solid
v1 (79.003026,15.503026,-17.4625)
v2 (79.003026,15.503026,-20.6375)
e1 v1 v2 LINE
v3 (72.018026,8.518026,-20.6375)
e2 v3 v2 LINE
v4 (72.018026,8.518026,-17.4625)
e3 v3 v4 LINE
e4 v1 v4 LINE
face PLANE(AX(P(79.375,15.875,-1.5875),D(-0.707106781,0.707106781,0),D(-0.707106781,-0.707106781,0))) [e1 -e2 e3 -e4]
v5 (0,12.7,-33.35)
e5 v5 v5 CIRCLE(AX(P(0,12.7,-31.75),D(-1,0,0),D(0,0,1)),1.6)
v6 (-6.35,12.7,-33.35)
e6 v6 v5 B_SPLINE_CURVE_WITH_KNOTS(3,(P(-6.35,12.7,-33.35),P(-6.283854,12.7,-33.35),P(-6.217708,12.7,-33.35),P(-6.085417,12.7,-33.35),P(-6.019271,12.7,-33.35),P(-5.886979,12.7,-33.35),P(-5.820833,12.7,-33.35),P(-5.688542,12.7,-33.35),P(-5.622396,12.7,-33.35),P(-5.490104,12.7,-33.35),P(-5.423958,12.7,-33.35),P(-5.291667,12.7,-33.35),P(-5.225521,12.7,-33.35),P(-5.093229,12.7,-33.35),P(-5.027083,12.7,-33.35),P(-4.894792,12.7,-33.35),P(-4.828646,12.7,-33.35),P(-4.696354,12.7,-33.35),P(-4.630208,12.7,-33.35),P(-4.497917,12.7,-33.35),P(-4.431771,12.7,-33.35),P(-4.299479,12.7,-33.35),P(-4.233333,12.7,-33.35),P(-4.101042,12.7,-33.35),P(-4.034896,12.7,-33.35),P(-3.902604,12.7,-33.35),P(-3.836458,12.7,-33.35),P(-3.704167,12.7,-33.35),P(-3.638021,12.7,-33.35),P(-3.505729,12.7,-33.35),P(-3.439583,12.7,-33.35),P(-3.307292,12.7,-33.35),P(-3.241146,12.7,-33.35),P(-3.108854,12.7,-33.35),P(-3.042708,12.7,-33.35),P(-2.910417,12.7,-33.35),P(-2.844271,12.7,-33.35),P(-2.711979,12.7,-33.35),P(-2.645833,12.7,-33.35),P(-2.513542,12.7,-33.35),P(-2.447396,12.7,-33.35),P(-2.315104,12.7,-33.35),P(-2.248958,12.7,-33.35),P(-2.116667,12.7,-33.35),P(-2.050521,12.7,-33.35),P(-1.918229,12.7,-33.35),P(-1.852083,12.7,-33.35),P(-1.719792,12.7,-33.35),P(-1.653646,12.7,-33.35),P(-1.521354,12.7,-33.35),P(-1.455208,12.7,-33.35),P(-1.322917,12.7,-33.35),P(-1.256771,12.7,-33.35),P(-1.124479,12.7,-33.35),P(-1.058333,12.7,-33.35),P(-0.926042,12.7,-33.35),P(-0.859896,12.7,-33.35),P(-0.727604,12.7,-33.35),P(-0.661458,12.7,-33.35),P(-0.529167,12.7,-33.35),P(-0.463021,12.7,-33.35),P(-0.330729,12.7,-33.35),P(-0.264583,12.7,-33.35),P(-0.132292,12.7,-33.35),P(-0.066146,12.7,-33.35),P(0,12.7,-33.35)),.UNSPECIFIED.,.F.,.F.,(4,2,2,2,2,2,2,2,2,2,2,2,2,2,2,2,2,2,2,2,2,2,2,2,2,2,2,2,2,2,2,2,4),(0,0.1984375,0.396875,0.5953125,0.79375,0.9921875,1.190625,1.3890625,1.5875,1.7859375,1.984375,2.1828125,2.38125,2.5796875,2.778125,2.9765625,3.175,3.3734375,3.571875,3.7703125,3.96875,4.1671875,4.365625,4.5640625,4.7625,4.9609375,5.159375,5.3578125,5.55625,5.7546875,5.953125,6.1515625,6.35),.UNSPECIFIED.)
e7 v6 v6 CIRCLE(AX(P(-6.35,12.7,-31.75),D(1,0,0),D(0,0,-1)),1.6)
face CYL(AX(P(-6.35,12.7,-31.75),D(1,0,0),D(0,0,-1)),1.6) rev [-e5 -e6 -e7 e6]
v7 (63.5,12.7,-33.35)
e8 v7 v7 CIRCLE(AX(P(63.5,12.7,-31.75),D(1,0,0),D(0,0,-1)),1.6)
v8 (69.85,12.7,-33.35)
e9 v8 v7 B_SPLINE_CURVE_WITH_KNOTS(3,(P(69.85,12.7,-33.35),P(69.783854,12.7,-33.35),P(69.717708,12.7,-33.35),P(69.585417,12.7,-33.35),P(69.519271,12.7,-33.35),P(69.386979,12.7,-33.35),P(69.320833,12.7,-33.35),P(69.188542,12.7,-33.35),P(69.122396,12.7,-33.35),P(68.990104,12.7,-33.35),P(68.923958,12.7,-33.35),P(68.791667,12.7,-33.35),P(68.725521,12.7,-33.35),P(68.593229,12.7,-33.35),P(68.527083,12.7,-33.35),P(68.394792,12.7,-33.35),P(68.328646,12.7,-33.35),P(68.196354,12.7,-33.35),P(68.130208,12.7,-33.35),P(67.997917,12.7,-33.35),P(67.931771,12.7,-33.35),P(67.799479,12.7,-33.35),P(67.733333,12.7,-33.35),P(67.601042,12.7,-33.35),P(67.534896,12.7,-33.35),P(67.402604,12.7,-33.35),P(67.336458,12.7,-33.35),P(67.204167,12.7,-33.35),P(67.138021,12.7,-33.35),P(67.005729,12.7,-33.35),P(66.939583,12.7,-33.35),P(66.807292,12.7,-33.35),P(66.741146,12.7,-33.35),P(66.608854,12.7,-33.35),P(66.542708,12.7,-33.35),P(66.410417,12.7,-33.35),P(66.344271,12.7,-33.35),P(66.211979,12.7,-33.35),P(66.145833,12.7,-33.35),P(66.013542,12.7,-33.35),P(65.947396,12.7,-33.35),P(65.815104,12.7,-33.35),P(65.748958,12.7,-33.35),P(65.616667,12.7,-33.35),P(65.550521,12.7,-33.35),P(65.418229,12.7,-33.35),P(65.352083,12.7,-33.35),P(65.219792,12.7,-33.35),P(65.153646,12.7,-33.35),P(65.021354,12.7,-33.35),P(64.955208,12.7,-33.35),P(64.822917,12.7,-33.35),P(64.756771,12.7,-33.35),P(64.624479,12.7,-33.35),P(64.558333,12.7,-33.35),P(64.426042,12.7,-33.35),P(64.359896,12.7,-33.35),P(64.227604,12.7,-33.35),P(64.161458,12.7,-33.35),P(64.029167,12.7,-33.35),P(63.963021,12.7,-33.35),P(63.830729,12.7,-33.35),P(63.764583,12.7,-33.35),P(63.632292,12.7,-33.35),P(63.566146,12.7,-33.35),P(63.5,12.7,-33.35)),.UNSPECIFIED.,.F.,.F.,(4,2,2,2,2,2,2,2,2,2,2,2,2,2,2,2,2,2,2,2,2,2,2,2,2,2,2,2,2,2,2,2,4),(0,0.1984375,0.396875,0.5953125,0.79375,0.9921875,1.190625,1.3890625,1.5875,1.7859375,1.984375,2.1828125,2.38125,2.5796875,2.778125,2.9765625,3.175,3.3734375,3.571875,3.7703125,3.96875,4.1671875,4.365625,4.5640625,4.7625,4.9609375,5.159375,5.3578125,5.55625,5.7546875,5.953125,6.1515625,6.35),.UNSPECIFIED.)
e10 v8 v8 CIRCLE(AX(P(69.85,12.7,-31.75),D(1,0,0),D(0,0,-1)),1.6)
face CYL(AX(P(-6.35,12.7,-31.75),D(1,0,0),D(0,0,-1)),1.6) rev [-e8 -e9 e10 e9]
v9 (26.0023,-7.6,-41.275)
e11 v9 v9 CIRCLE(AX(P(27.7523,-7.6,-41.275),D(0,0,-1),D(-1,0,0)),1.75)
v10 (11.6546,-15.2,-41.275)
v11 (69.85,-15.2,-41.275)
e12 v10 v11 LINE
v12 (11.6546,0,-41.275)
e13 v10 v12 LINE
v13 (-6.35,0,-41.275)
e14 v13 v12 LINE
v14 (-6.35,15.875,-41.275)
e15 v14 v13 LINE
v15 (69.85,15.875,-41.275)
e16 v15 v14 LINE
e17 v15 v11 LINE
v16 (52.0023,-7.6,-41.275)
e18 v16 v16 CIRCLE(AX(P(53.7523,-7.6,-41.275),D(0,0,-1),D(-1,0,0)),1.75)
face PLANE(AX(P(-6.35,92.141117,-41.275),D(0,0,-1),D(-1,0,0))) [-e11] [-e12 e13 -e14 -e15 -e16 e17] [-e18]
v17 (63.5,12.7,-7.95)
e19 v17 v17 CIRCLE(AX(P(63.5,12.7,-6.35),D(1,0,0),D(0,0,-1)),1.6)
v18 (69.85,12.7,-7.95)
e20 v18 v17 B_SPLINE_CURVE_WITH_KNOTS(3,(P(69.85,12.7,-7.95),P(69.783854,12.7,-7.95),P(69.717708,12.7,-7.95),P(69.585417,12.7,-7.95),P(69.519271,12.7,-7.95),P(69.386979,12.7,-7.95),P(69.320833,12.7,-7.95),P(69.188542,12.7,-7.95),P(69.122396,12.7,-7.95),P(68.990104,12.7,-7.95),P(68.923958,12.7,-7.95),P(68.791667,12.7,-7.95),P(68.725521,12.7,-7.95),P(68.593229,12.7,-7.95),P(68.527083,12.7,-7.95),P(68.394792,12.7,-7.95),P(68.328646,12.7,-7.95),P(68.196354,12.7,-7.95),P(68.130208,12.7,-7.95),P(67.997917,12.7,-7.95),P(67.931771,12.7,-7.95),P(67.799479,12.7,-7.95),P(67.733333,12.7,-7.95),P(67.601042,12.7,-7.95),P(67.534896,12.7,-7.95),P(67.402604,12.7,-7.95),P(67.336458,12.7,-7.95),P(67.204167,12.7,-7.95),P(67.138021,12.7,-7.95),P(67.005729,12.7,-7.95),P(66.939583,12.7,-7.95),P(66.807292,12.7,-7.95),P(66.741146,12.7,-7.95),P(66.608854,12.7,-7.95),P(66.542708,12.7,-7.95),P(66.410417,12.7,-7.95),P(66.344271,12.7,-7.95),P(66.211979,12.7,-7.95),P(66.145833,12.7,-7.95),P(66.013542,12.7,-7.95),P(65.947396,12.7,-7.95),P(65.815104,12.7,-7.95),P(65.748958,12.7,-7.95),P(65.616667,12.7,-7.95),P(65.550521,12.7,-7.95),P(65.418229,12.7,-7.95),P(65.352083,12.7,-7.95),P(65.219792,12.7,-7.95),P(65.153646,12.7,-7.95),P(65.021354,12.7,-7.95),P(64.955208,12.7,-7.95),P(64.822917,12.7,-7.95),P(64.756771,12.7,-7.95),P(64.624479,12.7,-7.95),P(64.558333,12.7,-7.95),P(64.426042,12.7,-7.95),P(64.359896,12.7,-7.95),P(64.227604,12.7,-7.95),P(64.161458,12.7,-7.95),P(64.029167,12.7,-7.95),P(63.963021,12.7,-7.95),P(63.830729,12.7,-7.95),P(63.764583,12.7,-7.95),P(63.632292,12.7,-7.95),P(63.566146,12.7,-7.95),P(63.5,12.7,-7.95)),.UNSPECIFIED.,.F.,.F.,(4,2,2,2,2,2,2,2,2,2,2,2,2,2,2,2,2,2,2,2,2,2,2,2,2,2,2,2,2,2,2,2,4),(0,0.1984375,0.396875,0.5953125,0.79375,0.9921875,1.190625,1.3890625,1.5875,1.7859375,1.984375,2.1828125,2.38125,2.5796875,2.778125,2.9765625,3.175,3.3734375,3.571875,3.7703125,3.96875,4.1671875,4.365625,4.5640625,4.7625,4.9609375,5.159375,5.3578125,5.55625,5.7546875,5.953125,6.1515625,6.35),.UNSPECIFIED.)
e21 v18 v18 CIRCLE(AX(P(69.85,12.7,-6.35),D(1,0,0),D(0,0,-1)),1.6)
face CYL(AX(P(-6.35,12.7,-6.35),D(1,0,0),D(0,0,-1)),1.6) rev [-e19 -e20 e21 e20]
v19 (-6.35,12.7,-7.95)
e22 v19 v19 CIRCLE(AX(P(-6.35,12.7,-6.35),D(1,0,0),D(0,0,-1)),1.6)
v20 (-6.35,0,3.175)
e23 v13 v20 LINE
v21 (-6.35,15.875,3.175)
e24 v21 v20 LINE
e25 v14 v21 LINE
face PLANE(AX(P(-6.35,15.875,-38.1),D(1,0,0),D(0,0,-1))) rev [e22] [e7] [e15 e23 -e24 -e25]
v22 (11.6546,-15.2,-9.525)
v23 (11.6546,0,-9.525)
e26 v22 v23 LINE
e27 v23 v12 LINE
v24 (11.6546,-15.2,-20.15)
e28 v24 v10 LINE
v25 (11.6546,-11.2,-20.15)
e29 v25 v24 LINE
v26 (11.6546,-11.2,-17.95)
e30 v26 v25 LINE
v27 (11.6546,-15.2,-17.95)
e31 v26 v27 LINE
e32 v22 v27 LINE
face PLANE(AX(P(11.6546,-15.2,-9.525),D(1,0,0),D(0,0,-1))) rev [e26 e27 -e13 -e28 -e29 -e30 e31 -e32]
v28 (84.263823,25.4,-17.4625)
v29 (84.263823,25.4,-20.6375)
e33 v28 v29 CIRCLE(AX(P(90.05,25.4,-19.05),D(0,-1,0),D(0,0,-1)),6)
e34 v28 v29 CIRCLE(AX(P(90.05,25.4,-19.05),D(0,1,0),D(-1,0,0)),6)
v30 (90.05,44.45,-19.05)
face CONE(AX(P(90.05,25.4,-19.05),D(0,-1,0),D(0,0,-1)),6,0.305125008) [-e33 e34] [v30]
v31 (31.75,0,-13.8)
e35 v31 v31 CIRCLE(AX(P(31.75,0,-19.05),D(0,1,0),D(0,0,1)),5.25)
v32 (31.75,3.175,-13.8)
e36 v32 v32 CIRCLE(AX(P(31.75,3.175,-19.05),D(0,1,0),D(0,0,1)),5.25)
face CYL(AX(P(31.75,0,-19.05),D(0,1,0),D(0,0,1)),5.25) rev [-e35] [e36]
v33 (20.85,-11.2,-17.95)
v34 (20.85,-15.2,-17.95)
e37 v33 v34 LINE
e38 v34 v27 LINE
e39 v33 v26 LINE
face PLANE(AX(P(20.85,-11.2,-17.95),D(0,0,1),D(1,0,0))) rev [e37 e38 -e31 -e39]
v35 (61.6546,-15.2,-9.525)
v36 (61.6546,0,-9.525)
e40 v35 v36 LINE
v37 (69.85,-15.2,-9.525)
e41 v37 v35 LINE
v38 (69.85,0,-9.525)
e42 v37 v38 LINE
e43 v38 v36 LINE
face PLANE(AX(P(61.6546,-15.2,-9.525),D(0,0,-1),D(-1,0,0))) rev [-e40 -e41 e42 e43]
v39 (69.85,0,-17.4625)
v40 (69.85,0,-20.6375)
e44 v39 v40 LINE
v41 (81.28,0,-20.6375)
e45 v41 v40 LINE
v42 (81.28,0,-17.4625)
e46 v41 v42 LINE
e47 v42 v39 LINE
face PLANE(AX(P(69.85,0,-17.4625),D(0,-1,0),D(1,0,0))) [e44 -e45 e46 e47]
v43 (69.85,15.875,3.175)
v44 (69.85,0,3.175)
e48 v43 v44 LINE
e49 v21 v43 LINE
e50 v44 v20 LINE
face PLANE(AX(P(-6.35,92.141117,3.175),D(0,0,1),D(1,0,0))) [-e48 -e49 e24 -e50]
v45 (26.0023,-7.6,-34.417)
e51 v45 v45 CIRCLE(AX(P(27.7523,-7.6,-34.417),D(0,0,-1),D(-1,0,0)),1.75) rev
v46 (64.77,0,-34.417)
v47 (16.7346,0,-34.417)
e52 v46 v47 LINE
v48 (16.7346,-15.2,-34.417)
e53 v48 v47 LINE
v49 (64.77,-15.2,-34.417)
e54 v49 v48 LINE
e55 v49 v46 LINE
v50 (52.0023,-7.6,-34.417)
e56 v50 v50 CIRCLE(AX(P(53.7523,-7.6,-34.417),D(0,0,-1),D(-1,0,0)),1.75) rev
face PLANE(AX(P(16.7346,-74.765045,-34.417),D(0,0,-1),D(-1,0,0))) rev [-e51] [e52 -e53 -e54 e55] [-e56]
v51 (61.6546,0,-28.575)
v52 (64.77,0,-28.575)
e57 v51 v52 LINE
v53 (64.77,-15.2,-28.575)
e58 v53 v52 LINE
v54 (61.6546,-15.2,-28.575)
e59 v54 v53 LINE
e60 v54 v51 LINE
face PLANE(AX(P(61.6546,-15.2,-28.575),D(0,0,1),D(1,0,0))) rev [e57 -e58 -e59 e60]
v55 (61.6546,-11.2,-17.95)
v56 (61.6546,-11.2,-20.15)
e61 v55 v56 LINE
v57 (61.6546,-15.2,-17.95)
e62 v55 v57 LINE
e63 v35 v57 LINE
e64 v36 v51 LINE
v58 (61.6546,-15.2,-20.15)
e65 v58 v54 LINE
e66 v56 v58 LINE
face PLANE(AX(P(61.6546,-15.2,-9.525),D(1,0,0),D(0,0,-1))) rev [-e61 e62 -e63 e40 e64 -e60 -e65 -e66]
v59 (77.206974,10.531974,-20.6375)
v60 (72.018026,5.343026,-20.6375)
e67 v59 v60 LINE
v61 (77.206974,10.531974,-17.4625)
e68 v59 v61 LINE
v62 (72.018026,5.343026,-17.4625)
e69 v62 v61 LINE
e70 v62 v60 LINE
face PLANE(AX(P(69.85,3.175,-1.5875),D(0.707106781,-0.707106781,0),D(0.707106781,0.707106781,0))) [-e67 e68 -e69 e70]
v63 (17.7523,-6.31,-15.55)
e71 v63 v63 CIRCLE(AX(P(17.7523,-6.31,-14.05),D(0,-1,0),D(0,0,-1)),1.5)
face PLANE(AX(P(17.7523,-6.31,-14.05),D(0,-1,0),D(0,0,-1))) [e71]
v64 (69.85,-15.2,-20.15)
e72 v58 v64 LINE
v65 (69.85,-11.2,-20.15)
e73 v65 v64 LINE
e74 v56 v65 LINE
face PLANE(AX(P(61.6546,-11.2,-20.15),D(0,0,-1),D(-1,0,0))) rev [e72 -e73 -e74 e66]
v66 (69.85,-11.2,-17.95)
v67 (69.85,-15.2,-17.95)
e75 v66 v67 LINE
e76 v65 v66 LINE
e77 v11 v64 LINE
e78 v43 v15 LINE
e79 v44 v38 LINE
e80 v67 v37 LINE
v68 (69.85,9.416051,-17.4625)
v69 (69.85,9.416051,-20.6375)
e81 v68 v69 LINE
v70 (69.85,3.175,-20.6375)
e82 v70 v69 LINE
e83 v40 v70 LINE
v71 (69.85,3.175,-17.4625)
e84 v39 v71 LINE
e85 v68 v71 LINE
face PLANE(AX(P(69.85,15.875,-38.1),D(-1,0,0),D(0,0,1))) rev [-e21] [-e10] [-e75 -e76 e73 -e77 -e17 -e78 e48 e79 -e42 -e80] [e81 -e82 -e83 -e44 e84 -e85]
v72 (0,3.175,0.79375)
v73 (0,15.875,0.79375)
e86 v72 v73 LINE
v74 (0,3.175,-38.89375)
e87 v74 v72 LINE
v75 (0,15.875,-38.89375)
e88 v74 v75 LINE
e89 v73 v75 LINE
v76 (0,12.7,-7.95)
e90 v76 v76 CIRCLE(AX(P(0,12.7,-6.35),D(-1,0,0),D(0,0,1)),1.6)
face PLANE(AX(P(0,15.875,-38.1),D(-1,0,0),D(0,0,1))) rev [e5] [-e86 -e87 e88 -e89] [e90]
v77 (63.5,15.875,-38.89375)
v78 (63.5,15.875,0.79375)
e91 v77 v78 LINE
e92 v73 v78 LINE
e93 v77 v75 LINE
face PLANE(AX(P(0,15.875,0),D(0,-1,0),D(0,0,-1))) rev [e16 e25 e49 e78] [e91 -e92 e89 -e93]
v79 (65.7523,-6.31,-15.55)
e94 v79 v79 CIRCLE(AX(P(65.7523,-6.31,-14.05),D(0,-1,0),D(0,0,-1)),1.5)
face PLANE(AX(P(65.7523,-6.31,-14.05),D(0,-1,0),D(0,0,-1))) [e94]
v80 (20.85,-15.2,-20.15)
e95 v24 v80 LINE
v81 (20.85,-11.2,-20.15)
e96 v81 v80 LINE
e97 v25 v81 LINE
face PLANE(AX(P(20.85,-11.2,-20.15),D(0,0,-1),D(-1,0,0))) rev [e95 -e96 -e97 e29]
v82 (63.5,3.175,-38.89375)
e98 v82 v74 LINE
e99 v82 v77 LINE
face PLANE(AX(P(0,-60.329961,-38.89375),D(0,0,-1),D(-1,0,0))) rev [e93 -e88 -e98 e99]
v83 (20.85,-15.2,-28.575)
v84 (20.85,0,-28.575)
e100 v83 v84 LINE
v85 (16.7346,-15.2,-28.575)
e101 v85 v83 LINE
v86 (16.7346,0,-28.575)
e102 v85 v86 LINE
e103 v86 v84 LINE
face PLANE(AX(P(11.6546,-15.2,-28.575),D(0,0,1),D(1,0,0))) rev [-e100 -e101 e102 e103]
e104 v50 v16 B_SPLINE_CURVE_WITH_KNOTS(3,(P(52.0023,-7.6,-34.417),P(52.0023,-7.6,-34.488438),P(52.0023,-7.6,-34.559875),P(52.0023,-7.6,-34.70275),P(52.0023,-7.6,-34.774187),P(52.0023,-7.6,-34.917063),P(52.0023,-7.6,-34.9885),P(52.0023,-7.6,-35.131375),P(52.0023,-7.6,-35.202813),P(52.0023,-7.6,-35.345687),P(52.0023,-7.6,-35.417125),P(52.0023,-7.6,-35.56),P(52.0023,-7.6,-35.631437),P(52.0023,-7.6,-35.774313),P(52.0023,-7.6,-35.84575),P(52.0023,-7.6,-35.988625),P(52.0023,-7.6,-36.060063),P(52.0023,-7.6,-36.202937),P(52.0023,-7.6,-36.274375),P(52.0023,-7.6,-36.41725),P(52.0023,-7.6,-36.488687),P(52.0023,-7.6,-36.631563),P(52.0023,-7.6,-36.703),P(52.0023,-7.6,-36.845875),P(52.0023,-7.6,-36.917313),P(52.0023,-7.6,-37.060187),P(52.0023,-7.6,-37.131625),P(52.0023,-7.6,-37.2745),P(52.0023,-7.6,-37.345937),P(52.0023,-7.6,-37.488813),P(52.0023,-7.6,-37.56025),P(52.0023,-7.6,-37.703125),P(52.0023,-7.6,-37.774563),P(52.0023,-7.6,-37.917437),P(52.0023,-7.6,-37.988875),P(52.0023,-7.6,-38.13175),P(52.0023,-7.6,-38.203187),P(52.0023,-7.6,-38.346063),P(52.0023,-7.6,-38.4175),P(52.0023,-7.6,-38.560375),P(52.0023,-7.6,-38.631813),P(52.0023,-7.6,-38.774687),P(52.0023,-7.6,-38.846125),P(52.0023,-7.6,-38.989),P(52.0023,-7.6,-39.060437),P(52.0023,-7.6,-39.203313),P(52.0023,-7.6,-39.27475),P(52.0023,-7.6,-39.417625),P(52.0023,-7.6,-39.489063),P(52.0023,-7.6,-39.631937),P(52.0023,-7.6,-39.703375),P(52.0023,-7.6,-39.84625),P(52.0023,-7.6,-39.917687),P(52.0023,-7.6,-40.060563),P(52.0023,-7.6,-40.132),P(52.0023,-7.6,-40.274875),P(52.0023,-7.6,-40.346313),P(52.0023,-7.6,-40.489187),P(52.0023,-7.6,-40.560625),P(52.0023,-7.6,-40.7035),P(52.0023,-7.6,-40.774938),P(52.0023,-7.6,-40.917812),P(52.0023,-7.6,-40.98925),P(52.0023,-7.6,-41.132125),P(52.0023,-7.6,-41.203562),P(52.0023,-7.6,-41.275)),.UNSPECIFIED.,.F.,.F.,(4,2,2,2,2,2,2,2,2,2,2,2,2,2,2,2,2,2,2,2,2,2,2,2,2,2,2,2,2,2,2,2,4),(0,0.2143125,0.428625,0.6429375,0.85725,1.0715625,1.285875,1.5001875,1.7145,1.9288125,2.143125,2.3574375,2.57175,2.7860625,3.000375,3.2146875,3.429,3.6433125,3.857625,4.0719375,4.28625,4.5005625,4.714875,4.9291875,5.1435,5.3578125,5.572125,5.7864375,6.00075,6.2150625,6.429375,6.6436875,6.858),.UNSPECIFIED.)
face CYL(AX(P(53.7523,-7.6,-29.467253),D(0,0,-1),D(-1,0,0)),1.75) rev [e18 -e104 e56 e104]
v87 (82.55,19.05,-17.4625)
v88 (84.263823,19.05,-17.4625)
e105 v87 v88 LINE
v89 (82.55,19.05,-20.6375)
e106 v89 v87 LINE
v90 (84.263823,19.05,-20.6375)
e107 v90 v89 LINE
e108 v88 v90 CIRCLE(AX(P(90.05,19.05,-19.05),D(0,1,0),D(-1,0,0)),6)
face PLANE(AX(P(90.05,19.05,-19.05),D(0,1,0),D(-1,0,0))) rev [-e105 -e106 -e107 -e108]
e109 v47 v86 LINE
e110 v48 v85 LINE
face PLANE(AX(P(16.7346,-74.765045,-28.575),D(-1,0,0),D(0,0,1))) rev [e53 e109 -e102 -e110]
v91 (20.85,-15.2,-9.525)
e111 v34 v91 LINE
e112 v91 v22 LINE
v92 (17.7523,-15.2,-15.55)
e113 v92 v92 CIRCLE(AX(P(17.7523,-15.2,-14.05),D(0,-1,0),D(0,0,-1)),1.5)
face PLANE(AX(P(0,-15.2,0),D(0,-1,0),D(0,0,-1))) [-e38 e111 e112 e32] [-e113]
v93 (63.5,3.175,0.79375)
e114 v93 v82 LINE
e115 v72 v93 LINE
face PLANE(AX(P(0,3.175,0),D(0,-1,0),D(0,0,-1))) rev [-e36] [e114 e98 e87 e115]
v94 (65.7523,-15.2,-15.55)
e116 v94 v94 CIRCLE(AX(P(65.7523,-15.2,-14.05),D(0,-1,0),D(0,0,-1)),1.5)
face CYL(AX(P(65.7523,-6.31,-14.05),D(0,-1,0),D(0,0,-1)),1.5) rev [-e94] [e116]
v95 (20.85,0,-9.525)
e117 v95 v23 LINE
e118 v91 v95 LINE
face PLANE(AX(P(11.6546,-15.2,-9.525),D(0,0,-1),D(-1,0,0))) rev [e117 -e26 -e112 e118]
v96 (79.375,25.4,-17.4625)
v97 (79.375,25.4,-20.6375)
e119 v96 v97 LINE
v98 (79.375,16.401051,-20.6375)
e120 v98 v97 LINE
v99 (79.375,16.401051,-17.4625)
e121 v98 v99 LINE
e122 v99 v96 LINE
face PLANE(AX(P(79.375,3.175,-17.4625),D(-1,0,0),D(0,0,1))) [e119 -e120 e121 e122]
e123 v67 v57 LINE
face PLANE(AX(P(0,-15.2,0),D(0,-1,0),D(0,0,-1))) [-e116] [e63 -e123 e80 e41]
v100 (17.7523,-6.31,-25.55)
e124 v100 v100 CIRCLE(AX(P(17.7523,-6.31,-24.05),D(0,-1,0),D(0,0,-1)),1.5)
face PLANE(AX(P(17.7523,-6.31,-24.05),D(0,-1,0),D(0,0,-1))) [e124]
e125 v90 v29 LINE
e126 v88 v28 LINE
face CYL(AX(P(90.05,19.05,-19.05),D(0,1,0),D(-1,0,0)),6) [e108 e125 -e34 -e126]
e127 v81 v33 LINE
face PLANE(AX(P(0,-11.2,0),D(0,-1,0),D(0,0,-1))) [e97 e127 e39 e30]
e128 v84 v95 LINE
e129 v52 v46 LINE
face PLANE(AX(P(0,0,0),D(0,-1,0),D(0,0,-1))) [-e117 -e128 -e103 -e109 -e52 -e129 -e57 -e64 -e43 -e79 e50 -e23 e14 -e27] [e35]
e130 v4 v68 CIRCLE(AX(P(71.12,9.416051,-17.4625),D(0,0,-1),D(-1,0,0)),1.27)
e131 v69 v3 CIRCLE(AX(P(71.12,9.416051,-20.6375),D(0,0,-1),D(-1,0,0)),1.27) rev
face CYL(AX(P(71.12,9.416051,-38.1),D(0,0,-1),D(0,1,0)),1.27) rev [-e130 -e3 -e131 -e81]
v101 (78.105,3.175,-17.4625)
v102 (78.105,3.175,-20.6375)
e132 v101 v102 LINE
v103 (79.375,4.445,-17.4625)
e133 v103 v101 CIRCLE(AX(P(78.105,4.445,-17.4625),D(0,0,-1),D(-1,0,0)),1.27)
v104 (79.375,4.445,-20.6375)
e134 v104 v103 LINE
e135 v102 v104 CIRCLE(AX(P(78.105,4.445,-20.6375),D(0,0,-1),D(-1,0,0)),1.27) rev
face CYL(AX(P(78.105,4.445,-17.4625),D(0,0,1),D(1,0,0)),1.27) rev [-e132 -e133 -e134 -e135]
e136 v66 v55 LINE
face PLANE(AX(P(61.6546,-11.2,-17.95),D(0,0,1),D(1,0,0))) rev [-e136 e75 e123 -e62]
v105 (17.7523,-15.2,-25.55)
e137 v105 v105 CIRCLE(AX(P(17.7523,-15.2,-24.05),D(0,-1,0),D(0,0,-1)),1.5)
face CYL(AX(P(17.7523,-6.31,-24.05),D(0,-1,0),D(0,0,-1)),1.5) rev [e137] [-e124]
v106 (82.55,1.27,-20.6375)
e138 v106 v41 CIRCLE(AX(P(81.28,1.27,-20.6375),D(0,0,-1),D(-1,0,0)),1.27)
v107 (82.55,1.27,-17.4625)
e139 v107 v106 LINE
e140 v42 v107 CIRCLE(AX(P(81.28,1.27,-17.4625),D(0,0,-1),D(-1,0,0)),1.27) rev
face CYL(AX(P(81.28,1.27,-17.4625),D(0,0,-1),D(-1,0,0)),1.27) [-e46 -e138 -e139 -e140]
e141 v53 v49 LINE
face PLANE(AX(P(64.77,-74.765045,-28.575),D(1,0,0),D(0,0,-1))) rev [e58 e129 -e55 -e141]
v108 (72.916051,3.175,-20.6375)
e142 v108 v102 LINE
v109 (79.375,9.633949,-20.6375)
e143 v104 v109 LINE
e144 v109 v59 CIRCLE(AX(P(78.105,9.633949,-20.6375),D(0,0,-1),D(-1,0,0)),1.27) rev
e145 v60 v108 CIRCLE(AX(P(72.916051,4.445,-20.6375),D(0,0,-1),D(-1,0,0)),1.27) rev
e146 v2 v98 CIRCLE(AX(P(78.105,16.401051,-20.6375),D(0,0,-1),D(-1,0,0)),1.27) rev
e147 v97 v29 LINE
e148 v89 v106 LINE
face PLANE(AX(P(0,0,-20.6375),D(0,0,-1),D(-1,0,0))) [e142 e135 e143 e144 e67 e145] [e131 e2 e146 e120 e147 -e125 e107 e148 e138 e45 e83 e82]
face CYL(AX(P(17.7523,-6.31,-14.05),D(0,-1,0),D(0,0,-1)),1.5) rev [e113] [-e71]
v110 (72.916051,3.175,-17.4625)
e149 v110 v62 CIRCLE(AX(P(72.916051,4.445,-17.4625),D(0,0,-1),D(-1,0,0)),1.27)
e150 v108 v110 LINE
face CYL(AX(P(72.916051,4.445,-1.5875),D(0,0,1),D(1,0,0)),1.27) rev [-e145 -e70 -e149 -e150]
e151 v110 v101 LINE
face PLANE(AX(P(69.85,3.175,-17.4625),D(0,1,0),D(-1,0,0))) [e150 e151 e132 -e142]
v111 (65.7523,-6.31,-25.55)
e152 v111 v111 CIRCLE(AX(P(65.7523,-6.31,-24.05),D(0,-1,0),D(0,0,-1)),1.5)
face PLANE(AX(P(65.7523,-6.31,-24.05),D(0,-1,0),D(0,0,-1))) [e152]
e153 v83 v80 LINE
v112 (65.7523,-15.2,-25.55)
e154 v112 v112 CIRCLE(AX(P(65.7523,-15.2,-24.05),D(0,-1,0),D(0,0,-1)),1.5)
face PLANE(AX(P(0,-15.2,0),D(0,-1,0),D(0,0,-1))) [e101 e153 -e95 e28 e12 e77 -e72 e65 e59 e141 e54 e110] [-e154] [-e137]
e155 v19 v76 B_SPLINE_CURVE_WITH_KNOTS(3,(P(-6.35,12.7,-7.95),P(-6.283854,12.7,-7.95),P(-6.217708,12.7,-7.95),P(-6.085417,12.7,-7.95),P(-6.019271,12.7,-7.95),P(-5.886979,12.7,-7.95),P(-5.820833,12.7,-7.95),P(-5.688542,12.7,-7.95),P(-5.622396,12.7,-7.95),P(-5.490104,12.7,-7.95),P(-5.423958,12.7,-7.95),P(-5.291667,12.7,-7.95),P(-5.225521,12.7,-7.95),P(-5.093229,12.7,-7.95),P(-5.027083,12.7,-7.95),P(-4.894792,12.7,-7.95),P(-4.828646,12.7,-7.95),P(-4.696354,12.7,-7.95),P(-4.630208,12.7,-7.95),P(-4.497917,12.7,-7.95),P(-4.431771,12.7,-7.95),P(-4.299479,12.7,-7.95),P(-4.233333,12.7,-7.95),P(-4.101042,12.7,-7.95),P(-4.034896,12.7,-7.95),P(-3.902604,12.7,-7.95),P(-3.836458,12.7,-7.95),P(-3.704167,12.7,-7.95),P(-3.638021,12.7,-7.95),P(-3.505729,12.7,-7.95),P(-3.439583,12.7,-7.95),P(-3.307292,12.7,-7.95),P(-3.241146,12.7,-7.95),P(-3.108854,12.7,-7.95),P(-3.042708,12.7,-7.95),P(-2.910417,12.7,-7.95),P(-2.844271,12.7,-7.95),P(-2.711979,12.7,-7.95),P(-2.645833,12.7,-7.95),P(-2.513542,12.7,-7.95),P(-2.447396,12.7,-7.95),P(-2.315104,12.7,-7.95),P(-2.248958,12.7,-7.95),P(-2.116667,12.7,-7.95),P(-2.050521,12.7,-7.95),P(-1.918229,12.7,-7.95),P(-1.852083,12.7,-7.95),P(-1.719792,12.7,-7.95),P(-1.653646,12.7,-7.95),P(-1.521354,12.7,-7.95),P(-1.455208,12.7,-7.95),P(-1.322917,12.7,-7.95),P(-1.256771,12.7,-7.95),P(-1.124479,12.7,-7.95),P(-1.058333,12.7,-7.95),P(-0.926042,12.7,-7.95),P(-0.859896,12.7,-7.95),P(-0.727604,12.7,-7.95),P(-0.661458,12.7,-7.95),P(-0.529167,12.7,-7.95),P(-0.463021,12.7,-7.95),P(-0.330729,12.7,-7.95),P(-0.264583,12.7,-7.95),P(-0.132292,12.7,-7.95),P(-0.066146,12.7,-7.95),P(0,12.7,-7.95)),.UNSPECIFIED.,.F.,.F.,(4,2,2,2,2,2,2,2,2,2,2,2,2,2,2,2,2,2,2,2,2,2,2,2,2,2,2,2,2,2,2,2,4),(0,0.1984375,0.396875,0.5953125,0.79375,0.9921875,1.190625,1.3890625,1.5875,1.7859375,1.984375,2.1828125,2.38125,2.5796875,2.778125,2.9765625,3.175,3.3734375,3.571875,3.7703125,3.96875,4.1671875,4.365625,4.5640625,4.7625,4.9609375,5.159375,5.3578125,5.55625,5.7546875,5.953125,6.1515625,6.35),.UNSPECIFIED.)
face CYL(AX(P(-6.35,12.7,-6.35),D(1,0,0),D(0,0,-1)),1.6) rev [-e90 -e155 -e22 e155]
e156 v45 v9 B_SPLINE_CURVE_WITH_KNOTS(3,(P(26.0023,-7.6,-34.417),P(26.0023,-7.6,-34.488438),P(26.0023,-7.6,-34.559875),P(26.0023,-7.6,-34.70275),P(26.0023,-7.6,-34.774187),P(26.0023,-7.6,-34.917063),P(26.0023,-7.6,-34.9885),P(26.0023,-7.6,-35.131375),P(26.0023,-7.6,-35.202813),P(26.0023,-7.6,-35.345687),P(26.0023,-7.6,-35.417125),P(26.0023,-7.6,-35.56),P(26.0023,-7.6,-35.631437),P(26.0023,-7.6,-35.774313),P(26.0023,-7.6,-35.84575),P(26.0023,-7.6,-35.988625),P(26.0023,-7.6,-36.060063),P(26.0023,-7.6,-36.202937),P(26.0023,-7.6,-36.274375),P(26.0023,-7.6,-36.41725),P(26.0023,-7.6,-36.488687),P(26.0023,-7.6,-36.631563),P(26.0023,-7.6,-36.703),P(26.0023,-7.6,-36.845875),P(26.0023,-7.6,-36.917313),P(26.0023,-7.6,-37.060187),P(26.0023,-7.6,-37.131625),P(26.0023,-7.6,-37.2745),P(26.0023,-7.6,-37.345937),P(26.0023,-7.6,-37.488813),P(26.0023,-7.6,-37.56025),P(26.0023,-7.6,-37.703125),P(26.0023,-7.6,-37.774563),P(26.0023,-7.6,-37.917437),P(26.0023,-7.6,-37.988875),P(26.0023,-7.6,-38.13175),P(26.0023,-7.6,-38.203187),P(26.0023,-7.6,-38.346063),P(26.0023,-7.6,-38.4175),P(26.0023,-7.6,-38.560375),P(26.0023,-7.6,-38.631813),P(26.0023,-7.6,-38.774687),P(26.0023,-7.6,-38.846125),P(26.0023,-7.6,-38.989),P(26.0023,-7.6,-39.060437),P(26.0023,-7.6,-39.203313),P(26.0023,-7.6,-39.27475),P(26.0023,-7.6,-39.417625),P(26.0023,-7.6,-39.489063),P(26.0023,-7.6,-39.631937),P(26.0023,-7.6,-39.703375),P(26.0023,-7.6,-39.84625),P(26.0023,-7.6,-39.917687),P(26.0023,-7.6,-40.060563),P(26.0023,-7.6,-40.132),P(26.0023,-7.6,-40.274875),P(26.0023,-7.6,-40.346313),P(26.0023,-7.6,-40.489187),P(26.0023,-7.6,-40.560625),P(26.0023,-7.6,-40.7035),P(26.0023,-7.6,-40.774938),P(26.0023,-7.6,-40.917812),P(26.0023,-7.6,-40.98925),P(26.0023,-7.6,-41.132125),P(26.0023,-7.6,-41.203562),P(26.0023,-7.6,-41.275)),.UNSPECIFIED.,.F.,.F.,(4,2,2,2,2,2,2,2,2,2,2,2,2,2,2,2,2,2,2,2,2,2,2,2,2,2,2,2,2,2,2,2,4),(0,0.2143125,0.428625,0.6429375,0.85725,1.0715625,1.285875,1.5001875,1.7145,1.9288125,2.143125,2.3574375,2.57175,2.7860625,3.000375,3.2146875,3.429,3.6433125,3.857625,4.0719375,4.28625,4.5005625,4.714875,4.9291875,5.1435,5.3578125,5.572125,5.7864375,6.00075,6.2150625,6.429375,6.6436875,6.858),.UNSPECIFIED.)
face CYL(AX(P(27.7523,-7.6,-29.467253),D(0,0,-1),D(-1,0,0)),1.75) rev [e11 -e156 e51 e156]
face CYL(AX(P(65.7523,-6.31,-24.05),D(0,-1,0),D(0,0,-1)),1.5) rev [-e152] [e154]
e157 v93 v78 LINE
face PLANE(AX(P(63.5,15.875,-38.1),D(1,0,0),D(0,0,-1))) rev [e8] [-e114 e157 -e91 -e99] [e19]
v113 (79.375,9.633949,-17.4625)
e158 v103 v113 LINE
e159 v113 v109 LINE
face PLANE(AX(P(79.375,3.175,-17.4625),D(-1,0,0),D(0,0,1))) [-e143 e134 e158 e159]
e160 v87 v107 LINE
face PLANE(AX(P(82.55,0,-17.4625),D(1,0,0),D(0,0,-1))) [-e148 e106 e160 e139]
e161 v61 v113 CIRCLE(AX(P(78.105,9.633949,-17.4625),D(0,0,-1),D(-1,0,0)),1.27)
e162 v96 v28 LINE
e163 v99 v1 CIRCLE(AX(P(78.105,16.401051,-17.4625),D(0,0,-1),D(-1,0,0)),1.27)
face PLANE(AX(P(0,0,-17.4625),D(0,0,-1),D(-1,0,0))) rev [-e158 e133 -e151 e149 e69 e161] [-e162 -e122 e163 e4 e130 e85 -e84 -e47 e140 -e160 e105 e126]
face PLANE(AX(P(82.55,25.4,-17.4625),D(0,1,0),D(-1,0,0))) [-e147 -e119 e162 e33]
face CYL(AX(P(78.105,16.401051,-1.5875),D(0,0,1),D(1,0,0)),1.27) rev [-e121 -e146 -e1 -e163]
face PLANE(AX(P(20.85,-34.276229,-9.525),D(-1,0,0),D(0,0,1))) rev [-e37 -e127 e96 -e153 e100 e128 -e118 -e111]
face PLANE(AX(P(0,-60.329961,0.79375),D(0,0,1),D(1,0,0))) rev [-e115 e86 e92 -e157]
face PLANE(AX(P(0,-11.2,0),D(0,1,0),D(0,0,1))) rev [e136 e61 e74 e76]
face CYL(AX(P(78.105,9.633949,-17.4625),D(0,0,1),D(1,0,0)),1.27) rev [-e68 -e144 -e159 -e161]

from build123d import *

# Parameters (mm, degrees)
SKETCH1_W                = 63.5
SKETCH1_H                = 38.1
BASE_DEPTH               = 3.175
SKETCH3_W                = 6.35
SKETCH3_H                = 38.1
ROD_HOLDER_DEPTH         = 15.875
SKETCH4_R                = 1.6
ROD_HOLE_DEPTH           = 87.660634806
SKETCH7_R                = 5.25
GEARPINHOLE_10_5MM_DEPTH = 81.572467382
SKETCH9_W                = 76.2
SKETCH9_H                = 3.175
BOSS_EXTRUDE1_DEPTH      = 15.875
SKETCH11_W               = 8.195400186
SKETCH11_H               = 19.05
BOSS_EXTRUDE2_DEPTH      = 15.2
SKETCH20_W               = 1
SKETCH20_H               = 19.05
BOSS_EXTRUDE7_DEPTH      = 15.2
SKETCH12_R               = 1.5
CUT_EXTRUDE1_DEPTH       = 8.89
BOSS_EXTRUDE3_DEPTH      = 15.2
SKETCH14_R               = 1.75
CUT_EXTRUDE2_DEPTH       = 6.858
SKETCH15_W               = 63.5
SKETCH15_H               = 0.79375
CUT_EXTRUDE3_DEPTH       = 12.7
SKETCH16_W               = 9.195400186
SKETCH16_H               = 2.2
SKETCH16_W_2             = 8.195400186
CUT_EXTRUDE4_DEPTH       = 4
BOSS_EXTRUDE4_DEPTH      = 1.5875
BOSS_EXTRUDE4_DEPTH_BACK = 1.5875
BOSS_EXTRUDE4_START      = -22.225
SKETCH18_R               = 5
BOSS_EXTRUDE5_DEPTH      = 6.35
BOSS_EXTRUDE6_DEPTH      = 3.175
FILLET1_R                = 1.27
FILLET2_R                = 1.27
SKETCH21_R               = 5
BOSS_EXTRUDE8_DEPTH      = 6.35


with BuildPart() as part:
    # Sketch1 → Base (new body)
    with BuildSketch(Plane(origin=(0, 0, 0), x_dir=(1, 0, 0), z_dir=(0, 1, 0))):
        with Locations((31.75, 19.05)):
            Rectangle(SKETCH1_W, SKETCH1_H)
    extrude(amount=BASE_DEPTH)

    # Sketch3 → Rod Holder (add)
    with BuildSketch(Plane(origin=(0, 0, 0), x_dir=(1, 0, 0), z_dir=(0, 1, 0))):
        with Locations((-3.175, 19.05)):
            Rectangle(SKETCH3_W, SKETCH3_H)
        with Locations((66.675, 19.05)):
            Rectangle(SKETCH3_W, SKETCH3_H)
    extrude(amount=ROD_HOLDER_DEPTH)

    # Sketch4 → Rod Hole (cut, through all)
    with BuildSketch(Plane(origin=(69.85, 0, 0), x_dir=(0, 0, -1), z_dir=(1, 0, 0))):
        with Locations((6.35, 12.7)):
            Circle(SKETCH4_R)
        with Locations((31.75, 12.7)):
            Circle(SKETCH4_R)
    extrude(amount=-ROD_HOLE_DEPTH, mode=Mode.SUBTRACT)

    # Sketch7 → GearPinHole_10.5mm (cut, through all)
    with BuildSketch(Plane(origin=(0, 3.175, 0), x_dir=(1, 0, 0), z_dir=(0, 1, 0))):
        with Locations(Location((31.75, 19.05, 0), (0, 0, 270))):
            Circle(SKETCH7_R)
    extrude(amount=-GEARPINHOLE_10_5MM_DEPTH, mode=Mode.SUBTRACT)

    # Sketch9 → Boss-Extrude1 (add)
    with BuildSketch(Plane.XZ):
        with Locations((31.75, 1.5875)):
            Rectangle(SKETCH9_W, SKETCH9_H)
        with Locations((31.75, -39.6875)):
            Rectangle(SKETCH9_W, SKETCH9_H)
    extrude(amount=-BOSS_EXTRUDE1_DEPTH)

    # Sketch11 → Boss-Extrude2 (add)
    with BuildSketch(Plane.XZ):
        with Locations((15.752300005, -19.05)):
            Rectangle(SKETCH11_W, SKETCH11_H)
        with Locations((65.752299907, -19.05)):
            Rectangle(SKETCH11_W, SKETCH11_H)
    extrude(amount=BOSS_EXTRUDE2_DEPTH)

    # Sketch20 → Boss-Extrude7 (add)
    with BuildSketch(Plane.XZ):
        with Locations((20.350000098, -19.05)):
            Rectangle(SKETCH20_W, SKETCH20_H)
    extrude(amount=BOSS_EXTRUDE7_DEPTH)

    # Sketch12 → Cut-Extrude1 (cut)
    with BuildSketch(Plane.XZ.offset(15.2)):
        with Locations(Location((17.75230014, -14.05, 0), (0, 0, 270))):
            Circle(SKETCH12_R)
        with Locations(Location((17.75230014, -24.05, 0), (0, 0, 270))):
            Circle(SKETCH12_R)
        with Locations(Location((65.752299962, -24.05, 0), (0, 0, 270))):
            Circle(SKETCH12_R)
        with Locations(Location((65.752299962, -14.05, 0), (0, 0, 270))):
            Circle(SKETCH12_R)
    extrude(amount=-CUT_EXTRUDE1_DEPTH, mode=Mode.SUBTRACT)

    # Sketch13 → Boss-Extrude3 (add)
    with BuildSketch(Plane.XZ):
        Polygon((11.654599912, -28.575), (16.734599912, -28.575), (16.734599912, -34.417), (64.77, -34.417), (64.77, -28.575), (69.85, -28.575), (69.85, -41.275), (11.654599912, -41.275), align=None)
    extrude(amount=BOSS_EXTRUDE3_DEPTH)

    # Sketch14 → Cut-Extrude2 (cut)
    with BuildSketch(Plane(origin=(0, 0, -41.275), x_dir=(-1, 0, 0), z_dir=(0, 0, -1))):
        with Locations((-53.752299956, -7.6)):
            Circle(SKETCH14_R)
        with Locations((-27.752299956, -7.6)):
            Circle(SKETCH14_R)
    extrude(amount=-CUT_EXTRUDE2_DEPTH, mode=Mode.SUBTRACT)

    # Sketch15 → Cut-Extrude3 (cut)
    with BuildSketch(Plane(origin=(0, 15.875, 0), x_dir=(1, 0, 0), z_dir=(0, 1, 0))):
        with Locations((31.75, 38.496875)):
            Rectangle(SKETCH15_W, SKETCH15_H)
        with Locations((31.75, -0.396875)):
            Rectangle(SKETCH15_W, SKETCH15_H)
    extrude(amount=-CUT_EXTRUDE3_DEPTH, mode=Mode.SUBTRACT)

    # Sketch16 → Cut-Extrude4 (cut)
    with BuildSketch(Plane.XZ.offset(15.2)):
        with Locations((16.252300005, -19.05)):
            Rectangle(SKETCH16_W, SKETCH16_H)
        with Locations((65.752299907, -19.05)):
            Rectangle(SKETCH16_W_2, SKETCH16_H)
    extrude(amount=-CUT_EXTRUDE4_DEPTH, mode=Mode.SUBTRACT)

    # Sketch17 → Boss-Extrude4 (add, two sides: drawn at the far end of the back side and taken through both)
    with BuildSketch(Plane(origin=(0, 0, -41.275), x_dir=(-1, 0, 0), z_dir=(0, 0, -1)).offset(BOSS_EXTRUDE4_START - BOSS_EXTRUDE4_DEPTH_BACK)):
        Polygon((-69.85, 0), (-82.55, 0), (-82.55, 25.4), (-79.375, 25.4), (-79.375, 3.175), (-69.85, 3.175), align=None)
    extrude(amount=BOSS_EXTRUDE4_DEPTH + BOSS_EXTRUDE4_DEPTH_BACK)

    # Sketch18 → Boss-Extrude5 (add)
    with BuildSketch(Plane(origin=(0, 25.4, 0), x_dir=(1, 0, 0), z_dir=(0, 1, 0))):
        with BuildLine():
            Line((82.55, 20.6375), (84.263823045, 20.6375))
            ThreePointArc((84.263823045, 20.6375), (96.05, 19.05), (84.263823045, 17.4625))
            Line((84.263823045, 17.4625), (82.55, 17.4625))
            Line((82.55, 17.4625), (82.55, 20.6375))
        make_face()
        with Locations(Location((90.05, 19.05, 0), (0, 0, 180))):
            Circle(SKETCH18_R, mode=Mode.SUBTRACT)
    extrude(amount=-BOSS_EXTRUDE5_DEPTH)

    # Sketch19 → Boss-Extrude6 (add)
    with BuildSketch(Plane(origin=(0, 0, -20.6375), x_dir=(-1, 0, 0), z_dir=(0, 0, -1))):
        Polygon((-79.375, 15.875), (-69.85, 6.35), (-69.85, 3.175), (-79.375, 12.7), align=None)
    extrude(amount=-BOSS_EXTRUDE6_DEPTH)

    # Fillet1
    fillet1_edges = [part.edges().sort_by_distance(p)[0] for p in [
        (82.55, 0, -19.05),
        (79.375, 3.175, -19.05),
        (79.375, 12.7, -19.05),
        (79.375, 15.875, -19.05),
        (69.85, 6.35, -19.05),
    ]]
    fillet(fillet1_edges, radius=FILLET1_R)

    # Fillet2
    # the kernel refuses this fillet: 1.27 mm, written as the material it adds along each edge
    with BuildSketch(Plane(origin=(69.85, 3.175, -17.4625), x_dir=(1, 0, 0), z_dir=(0, 0, -1))) as fillet2_piece_1:
        with BuildLine():
            CenterArc((FILLET2_R * 2.41421356237, -FILLET2_R), FILLET2_R, 90, 135)
            Line((FILLET2_R * 1.70710678119, -FILLET2_R * 1.70710678119), (0, 0))
            Line((0, 0), (FILLET2_R * 2.41421356237, 0))
        make_face()
    extrude(amount=3.175)

    # Sketch21 → Boss-Extrude8 (add)
    with BuildSketch(Plane(origin=(0, 25.4, 0), x_dir=(1, 0, 0), z_dir=(0, 1, 0))):
        with Locations((90.05, 19.05)):
            Circle(SKETCH21_R)
    extrude(amount=-BOSS_EXTRUDE8_DEPTH)

    # Sketch22 → Revolve1 (revolve)
    with BuildSketch(Plane.XY.offset(-19.05), mode=Mode.PRIVATE) as revolve1_sk:
        Polygon((90.05, 25.4), (90.05, 44.45), (96.05, 25.4), align=None)
    revolve(revolve1_sk.sketch.rotate(Axis((90.05, 25.4, -19.05), (0, 1, 0)), 90), axis=Axis((90.05, 25.4, -19.05), (0, 1, 0)))


solid = part.part
